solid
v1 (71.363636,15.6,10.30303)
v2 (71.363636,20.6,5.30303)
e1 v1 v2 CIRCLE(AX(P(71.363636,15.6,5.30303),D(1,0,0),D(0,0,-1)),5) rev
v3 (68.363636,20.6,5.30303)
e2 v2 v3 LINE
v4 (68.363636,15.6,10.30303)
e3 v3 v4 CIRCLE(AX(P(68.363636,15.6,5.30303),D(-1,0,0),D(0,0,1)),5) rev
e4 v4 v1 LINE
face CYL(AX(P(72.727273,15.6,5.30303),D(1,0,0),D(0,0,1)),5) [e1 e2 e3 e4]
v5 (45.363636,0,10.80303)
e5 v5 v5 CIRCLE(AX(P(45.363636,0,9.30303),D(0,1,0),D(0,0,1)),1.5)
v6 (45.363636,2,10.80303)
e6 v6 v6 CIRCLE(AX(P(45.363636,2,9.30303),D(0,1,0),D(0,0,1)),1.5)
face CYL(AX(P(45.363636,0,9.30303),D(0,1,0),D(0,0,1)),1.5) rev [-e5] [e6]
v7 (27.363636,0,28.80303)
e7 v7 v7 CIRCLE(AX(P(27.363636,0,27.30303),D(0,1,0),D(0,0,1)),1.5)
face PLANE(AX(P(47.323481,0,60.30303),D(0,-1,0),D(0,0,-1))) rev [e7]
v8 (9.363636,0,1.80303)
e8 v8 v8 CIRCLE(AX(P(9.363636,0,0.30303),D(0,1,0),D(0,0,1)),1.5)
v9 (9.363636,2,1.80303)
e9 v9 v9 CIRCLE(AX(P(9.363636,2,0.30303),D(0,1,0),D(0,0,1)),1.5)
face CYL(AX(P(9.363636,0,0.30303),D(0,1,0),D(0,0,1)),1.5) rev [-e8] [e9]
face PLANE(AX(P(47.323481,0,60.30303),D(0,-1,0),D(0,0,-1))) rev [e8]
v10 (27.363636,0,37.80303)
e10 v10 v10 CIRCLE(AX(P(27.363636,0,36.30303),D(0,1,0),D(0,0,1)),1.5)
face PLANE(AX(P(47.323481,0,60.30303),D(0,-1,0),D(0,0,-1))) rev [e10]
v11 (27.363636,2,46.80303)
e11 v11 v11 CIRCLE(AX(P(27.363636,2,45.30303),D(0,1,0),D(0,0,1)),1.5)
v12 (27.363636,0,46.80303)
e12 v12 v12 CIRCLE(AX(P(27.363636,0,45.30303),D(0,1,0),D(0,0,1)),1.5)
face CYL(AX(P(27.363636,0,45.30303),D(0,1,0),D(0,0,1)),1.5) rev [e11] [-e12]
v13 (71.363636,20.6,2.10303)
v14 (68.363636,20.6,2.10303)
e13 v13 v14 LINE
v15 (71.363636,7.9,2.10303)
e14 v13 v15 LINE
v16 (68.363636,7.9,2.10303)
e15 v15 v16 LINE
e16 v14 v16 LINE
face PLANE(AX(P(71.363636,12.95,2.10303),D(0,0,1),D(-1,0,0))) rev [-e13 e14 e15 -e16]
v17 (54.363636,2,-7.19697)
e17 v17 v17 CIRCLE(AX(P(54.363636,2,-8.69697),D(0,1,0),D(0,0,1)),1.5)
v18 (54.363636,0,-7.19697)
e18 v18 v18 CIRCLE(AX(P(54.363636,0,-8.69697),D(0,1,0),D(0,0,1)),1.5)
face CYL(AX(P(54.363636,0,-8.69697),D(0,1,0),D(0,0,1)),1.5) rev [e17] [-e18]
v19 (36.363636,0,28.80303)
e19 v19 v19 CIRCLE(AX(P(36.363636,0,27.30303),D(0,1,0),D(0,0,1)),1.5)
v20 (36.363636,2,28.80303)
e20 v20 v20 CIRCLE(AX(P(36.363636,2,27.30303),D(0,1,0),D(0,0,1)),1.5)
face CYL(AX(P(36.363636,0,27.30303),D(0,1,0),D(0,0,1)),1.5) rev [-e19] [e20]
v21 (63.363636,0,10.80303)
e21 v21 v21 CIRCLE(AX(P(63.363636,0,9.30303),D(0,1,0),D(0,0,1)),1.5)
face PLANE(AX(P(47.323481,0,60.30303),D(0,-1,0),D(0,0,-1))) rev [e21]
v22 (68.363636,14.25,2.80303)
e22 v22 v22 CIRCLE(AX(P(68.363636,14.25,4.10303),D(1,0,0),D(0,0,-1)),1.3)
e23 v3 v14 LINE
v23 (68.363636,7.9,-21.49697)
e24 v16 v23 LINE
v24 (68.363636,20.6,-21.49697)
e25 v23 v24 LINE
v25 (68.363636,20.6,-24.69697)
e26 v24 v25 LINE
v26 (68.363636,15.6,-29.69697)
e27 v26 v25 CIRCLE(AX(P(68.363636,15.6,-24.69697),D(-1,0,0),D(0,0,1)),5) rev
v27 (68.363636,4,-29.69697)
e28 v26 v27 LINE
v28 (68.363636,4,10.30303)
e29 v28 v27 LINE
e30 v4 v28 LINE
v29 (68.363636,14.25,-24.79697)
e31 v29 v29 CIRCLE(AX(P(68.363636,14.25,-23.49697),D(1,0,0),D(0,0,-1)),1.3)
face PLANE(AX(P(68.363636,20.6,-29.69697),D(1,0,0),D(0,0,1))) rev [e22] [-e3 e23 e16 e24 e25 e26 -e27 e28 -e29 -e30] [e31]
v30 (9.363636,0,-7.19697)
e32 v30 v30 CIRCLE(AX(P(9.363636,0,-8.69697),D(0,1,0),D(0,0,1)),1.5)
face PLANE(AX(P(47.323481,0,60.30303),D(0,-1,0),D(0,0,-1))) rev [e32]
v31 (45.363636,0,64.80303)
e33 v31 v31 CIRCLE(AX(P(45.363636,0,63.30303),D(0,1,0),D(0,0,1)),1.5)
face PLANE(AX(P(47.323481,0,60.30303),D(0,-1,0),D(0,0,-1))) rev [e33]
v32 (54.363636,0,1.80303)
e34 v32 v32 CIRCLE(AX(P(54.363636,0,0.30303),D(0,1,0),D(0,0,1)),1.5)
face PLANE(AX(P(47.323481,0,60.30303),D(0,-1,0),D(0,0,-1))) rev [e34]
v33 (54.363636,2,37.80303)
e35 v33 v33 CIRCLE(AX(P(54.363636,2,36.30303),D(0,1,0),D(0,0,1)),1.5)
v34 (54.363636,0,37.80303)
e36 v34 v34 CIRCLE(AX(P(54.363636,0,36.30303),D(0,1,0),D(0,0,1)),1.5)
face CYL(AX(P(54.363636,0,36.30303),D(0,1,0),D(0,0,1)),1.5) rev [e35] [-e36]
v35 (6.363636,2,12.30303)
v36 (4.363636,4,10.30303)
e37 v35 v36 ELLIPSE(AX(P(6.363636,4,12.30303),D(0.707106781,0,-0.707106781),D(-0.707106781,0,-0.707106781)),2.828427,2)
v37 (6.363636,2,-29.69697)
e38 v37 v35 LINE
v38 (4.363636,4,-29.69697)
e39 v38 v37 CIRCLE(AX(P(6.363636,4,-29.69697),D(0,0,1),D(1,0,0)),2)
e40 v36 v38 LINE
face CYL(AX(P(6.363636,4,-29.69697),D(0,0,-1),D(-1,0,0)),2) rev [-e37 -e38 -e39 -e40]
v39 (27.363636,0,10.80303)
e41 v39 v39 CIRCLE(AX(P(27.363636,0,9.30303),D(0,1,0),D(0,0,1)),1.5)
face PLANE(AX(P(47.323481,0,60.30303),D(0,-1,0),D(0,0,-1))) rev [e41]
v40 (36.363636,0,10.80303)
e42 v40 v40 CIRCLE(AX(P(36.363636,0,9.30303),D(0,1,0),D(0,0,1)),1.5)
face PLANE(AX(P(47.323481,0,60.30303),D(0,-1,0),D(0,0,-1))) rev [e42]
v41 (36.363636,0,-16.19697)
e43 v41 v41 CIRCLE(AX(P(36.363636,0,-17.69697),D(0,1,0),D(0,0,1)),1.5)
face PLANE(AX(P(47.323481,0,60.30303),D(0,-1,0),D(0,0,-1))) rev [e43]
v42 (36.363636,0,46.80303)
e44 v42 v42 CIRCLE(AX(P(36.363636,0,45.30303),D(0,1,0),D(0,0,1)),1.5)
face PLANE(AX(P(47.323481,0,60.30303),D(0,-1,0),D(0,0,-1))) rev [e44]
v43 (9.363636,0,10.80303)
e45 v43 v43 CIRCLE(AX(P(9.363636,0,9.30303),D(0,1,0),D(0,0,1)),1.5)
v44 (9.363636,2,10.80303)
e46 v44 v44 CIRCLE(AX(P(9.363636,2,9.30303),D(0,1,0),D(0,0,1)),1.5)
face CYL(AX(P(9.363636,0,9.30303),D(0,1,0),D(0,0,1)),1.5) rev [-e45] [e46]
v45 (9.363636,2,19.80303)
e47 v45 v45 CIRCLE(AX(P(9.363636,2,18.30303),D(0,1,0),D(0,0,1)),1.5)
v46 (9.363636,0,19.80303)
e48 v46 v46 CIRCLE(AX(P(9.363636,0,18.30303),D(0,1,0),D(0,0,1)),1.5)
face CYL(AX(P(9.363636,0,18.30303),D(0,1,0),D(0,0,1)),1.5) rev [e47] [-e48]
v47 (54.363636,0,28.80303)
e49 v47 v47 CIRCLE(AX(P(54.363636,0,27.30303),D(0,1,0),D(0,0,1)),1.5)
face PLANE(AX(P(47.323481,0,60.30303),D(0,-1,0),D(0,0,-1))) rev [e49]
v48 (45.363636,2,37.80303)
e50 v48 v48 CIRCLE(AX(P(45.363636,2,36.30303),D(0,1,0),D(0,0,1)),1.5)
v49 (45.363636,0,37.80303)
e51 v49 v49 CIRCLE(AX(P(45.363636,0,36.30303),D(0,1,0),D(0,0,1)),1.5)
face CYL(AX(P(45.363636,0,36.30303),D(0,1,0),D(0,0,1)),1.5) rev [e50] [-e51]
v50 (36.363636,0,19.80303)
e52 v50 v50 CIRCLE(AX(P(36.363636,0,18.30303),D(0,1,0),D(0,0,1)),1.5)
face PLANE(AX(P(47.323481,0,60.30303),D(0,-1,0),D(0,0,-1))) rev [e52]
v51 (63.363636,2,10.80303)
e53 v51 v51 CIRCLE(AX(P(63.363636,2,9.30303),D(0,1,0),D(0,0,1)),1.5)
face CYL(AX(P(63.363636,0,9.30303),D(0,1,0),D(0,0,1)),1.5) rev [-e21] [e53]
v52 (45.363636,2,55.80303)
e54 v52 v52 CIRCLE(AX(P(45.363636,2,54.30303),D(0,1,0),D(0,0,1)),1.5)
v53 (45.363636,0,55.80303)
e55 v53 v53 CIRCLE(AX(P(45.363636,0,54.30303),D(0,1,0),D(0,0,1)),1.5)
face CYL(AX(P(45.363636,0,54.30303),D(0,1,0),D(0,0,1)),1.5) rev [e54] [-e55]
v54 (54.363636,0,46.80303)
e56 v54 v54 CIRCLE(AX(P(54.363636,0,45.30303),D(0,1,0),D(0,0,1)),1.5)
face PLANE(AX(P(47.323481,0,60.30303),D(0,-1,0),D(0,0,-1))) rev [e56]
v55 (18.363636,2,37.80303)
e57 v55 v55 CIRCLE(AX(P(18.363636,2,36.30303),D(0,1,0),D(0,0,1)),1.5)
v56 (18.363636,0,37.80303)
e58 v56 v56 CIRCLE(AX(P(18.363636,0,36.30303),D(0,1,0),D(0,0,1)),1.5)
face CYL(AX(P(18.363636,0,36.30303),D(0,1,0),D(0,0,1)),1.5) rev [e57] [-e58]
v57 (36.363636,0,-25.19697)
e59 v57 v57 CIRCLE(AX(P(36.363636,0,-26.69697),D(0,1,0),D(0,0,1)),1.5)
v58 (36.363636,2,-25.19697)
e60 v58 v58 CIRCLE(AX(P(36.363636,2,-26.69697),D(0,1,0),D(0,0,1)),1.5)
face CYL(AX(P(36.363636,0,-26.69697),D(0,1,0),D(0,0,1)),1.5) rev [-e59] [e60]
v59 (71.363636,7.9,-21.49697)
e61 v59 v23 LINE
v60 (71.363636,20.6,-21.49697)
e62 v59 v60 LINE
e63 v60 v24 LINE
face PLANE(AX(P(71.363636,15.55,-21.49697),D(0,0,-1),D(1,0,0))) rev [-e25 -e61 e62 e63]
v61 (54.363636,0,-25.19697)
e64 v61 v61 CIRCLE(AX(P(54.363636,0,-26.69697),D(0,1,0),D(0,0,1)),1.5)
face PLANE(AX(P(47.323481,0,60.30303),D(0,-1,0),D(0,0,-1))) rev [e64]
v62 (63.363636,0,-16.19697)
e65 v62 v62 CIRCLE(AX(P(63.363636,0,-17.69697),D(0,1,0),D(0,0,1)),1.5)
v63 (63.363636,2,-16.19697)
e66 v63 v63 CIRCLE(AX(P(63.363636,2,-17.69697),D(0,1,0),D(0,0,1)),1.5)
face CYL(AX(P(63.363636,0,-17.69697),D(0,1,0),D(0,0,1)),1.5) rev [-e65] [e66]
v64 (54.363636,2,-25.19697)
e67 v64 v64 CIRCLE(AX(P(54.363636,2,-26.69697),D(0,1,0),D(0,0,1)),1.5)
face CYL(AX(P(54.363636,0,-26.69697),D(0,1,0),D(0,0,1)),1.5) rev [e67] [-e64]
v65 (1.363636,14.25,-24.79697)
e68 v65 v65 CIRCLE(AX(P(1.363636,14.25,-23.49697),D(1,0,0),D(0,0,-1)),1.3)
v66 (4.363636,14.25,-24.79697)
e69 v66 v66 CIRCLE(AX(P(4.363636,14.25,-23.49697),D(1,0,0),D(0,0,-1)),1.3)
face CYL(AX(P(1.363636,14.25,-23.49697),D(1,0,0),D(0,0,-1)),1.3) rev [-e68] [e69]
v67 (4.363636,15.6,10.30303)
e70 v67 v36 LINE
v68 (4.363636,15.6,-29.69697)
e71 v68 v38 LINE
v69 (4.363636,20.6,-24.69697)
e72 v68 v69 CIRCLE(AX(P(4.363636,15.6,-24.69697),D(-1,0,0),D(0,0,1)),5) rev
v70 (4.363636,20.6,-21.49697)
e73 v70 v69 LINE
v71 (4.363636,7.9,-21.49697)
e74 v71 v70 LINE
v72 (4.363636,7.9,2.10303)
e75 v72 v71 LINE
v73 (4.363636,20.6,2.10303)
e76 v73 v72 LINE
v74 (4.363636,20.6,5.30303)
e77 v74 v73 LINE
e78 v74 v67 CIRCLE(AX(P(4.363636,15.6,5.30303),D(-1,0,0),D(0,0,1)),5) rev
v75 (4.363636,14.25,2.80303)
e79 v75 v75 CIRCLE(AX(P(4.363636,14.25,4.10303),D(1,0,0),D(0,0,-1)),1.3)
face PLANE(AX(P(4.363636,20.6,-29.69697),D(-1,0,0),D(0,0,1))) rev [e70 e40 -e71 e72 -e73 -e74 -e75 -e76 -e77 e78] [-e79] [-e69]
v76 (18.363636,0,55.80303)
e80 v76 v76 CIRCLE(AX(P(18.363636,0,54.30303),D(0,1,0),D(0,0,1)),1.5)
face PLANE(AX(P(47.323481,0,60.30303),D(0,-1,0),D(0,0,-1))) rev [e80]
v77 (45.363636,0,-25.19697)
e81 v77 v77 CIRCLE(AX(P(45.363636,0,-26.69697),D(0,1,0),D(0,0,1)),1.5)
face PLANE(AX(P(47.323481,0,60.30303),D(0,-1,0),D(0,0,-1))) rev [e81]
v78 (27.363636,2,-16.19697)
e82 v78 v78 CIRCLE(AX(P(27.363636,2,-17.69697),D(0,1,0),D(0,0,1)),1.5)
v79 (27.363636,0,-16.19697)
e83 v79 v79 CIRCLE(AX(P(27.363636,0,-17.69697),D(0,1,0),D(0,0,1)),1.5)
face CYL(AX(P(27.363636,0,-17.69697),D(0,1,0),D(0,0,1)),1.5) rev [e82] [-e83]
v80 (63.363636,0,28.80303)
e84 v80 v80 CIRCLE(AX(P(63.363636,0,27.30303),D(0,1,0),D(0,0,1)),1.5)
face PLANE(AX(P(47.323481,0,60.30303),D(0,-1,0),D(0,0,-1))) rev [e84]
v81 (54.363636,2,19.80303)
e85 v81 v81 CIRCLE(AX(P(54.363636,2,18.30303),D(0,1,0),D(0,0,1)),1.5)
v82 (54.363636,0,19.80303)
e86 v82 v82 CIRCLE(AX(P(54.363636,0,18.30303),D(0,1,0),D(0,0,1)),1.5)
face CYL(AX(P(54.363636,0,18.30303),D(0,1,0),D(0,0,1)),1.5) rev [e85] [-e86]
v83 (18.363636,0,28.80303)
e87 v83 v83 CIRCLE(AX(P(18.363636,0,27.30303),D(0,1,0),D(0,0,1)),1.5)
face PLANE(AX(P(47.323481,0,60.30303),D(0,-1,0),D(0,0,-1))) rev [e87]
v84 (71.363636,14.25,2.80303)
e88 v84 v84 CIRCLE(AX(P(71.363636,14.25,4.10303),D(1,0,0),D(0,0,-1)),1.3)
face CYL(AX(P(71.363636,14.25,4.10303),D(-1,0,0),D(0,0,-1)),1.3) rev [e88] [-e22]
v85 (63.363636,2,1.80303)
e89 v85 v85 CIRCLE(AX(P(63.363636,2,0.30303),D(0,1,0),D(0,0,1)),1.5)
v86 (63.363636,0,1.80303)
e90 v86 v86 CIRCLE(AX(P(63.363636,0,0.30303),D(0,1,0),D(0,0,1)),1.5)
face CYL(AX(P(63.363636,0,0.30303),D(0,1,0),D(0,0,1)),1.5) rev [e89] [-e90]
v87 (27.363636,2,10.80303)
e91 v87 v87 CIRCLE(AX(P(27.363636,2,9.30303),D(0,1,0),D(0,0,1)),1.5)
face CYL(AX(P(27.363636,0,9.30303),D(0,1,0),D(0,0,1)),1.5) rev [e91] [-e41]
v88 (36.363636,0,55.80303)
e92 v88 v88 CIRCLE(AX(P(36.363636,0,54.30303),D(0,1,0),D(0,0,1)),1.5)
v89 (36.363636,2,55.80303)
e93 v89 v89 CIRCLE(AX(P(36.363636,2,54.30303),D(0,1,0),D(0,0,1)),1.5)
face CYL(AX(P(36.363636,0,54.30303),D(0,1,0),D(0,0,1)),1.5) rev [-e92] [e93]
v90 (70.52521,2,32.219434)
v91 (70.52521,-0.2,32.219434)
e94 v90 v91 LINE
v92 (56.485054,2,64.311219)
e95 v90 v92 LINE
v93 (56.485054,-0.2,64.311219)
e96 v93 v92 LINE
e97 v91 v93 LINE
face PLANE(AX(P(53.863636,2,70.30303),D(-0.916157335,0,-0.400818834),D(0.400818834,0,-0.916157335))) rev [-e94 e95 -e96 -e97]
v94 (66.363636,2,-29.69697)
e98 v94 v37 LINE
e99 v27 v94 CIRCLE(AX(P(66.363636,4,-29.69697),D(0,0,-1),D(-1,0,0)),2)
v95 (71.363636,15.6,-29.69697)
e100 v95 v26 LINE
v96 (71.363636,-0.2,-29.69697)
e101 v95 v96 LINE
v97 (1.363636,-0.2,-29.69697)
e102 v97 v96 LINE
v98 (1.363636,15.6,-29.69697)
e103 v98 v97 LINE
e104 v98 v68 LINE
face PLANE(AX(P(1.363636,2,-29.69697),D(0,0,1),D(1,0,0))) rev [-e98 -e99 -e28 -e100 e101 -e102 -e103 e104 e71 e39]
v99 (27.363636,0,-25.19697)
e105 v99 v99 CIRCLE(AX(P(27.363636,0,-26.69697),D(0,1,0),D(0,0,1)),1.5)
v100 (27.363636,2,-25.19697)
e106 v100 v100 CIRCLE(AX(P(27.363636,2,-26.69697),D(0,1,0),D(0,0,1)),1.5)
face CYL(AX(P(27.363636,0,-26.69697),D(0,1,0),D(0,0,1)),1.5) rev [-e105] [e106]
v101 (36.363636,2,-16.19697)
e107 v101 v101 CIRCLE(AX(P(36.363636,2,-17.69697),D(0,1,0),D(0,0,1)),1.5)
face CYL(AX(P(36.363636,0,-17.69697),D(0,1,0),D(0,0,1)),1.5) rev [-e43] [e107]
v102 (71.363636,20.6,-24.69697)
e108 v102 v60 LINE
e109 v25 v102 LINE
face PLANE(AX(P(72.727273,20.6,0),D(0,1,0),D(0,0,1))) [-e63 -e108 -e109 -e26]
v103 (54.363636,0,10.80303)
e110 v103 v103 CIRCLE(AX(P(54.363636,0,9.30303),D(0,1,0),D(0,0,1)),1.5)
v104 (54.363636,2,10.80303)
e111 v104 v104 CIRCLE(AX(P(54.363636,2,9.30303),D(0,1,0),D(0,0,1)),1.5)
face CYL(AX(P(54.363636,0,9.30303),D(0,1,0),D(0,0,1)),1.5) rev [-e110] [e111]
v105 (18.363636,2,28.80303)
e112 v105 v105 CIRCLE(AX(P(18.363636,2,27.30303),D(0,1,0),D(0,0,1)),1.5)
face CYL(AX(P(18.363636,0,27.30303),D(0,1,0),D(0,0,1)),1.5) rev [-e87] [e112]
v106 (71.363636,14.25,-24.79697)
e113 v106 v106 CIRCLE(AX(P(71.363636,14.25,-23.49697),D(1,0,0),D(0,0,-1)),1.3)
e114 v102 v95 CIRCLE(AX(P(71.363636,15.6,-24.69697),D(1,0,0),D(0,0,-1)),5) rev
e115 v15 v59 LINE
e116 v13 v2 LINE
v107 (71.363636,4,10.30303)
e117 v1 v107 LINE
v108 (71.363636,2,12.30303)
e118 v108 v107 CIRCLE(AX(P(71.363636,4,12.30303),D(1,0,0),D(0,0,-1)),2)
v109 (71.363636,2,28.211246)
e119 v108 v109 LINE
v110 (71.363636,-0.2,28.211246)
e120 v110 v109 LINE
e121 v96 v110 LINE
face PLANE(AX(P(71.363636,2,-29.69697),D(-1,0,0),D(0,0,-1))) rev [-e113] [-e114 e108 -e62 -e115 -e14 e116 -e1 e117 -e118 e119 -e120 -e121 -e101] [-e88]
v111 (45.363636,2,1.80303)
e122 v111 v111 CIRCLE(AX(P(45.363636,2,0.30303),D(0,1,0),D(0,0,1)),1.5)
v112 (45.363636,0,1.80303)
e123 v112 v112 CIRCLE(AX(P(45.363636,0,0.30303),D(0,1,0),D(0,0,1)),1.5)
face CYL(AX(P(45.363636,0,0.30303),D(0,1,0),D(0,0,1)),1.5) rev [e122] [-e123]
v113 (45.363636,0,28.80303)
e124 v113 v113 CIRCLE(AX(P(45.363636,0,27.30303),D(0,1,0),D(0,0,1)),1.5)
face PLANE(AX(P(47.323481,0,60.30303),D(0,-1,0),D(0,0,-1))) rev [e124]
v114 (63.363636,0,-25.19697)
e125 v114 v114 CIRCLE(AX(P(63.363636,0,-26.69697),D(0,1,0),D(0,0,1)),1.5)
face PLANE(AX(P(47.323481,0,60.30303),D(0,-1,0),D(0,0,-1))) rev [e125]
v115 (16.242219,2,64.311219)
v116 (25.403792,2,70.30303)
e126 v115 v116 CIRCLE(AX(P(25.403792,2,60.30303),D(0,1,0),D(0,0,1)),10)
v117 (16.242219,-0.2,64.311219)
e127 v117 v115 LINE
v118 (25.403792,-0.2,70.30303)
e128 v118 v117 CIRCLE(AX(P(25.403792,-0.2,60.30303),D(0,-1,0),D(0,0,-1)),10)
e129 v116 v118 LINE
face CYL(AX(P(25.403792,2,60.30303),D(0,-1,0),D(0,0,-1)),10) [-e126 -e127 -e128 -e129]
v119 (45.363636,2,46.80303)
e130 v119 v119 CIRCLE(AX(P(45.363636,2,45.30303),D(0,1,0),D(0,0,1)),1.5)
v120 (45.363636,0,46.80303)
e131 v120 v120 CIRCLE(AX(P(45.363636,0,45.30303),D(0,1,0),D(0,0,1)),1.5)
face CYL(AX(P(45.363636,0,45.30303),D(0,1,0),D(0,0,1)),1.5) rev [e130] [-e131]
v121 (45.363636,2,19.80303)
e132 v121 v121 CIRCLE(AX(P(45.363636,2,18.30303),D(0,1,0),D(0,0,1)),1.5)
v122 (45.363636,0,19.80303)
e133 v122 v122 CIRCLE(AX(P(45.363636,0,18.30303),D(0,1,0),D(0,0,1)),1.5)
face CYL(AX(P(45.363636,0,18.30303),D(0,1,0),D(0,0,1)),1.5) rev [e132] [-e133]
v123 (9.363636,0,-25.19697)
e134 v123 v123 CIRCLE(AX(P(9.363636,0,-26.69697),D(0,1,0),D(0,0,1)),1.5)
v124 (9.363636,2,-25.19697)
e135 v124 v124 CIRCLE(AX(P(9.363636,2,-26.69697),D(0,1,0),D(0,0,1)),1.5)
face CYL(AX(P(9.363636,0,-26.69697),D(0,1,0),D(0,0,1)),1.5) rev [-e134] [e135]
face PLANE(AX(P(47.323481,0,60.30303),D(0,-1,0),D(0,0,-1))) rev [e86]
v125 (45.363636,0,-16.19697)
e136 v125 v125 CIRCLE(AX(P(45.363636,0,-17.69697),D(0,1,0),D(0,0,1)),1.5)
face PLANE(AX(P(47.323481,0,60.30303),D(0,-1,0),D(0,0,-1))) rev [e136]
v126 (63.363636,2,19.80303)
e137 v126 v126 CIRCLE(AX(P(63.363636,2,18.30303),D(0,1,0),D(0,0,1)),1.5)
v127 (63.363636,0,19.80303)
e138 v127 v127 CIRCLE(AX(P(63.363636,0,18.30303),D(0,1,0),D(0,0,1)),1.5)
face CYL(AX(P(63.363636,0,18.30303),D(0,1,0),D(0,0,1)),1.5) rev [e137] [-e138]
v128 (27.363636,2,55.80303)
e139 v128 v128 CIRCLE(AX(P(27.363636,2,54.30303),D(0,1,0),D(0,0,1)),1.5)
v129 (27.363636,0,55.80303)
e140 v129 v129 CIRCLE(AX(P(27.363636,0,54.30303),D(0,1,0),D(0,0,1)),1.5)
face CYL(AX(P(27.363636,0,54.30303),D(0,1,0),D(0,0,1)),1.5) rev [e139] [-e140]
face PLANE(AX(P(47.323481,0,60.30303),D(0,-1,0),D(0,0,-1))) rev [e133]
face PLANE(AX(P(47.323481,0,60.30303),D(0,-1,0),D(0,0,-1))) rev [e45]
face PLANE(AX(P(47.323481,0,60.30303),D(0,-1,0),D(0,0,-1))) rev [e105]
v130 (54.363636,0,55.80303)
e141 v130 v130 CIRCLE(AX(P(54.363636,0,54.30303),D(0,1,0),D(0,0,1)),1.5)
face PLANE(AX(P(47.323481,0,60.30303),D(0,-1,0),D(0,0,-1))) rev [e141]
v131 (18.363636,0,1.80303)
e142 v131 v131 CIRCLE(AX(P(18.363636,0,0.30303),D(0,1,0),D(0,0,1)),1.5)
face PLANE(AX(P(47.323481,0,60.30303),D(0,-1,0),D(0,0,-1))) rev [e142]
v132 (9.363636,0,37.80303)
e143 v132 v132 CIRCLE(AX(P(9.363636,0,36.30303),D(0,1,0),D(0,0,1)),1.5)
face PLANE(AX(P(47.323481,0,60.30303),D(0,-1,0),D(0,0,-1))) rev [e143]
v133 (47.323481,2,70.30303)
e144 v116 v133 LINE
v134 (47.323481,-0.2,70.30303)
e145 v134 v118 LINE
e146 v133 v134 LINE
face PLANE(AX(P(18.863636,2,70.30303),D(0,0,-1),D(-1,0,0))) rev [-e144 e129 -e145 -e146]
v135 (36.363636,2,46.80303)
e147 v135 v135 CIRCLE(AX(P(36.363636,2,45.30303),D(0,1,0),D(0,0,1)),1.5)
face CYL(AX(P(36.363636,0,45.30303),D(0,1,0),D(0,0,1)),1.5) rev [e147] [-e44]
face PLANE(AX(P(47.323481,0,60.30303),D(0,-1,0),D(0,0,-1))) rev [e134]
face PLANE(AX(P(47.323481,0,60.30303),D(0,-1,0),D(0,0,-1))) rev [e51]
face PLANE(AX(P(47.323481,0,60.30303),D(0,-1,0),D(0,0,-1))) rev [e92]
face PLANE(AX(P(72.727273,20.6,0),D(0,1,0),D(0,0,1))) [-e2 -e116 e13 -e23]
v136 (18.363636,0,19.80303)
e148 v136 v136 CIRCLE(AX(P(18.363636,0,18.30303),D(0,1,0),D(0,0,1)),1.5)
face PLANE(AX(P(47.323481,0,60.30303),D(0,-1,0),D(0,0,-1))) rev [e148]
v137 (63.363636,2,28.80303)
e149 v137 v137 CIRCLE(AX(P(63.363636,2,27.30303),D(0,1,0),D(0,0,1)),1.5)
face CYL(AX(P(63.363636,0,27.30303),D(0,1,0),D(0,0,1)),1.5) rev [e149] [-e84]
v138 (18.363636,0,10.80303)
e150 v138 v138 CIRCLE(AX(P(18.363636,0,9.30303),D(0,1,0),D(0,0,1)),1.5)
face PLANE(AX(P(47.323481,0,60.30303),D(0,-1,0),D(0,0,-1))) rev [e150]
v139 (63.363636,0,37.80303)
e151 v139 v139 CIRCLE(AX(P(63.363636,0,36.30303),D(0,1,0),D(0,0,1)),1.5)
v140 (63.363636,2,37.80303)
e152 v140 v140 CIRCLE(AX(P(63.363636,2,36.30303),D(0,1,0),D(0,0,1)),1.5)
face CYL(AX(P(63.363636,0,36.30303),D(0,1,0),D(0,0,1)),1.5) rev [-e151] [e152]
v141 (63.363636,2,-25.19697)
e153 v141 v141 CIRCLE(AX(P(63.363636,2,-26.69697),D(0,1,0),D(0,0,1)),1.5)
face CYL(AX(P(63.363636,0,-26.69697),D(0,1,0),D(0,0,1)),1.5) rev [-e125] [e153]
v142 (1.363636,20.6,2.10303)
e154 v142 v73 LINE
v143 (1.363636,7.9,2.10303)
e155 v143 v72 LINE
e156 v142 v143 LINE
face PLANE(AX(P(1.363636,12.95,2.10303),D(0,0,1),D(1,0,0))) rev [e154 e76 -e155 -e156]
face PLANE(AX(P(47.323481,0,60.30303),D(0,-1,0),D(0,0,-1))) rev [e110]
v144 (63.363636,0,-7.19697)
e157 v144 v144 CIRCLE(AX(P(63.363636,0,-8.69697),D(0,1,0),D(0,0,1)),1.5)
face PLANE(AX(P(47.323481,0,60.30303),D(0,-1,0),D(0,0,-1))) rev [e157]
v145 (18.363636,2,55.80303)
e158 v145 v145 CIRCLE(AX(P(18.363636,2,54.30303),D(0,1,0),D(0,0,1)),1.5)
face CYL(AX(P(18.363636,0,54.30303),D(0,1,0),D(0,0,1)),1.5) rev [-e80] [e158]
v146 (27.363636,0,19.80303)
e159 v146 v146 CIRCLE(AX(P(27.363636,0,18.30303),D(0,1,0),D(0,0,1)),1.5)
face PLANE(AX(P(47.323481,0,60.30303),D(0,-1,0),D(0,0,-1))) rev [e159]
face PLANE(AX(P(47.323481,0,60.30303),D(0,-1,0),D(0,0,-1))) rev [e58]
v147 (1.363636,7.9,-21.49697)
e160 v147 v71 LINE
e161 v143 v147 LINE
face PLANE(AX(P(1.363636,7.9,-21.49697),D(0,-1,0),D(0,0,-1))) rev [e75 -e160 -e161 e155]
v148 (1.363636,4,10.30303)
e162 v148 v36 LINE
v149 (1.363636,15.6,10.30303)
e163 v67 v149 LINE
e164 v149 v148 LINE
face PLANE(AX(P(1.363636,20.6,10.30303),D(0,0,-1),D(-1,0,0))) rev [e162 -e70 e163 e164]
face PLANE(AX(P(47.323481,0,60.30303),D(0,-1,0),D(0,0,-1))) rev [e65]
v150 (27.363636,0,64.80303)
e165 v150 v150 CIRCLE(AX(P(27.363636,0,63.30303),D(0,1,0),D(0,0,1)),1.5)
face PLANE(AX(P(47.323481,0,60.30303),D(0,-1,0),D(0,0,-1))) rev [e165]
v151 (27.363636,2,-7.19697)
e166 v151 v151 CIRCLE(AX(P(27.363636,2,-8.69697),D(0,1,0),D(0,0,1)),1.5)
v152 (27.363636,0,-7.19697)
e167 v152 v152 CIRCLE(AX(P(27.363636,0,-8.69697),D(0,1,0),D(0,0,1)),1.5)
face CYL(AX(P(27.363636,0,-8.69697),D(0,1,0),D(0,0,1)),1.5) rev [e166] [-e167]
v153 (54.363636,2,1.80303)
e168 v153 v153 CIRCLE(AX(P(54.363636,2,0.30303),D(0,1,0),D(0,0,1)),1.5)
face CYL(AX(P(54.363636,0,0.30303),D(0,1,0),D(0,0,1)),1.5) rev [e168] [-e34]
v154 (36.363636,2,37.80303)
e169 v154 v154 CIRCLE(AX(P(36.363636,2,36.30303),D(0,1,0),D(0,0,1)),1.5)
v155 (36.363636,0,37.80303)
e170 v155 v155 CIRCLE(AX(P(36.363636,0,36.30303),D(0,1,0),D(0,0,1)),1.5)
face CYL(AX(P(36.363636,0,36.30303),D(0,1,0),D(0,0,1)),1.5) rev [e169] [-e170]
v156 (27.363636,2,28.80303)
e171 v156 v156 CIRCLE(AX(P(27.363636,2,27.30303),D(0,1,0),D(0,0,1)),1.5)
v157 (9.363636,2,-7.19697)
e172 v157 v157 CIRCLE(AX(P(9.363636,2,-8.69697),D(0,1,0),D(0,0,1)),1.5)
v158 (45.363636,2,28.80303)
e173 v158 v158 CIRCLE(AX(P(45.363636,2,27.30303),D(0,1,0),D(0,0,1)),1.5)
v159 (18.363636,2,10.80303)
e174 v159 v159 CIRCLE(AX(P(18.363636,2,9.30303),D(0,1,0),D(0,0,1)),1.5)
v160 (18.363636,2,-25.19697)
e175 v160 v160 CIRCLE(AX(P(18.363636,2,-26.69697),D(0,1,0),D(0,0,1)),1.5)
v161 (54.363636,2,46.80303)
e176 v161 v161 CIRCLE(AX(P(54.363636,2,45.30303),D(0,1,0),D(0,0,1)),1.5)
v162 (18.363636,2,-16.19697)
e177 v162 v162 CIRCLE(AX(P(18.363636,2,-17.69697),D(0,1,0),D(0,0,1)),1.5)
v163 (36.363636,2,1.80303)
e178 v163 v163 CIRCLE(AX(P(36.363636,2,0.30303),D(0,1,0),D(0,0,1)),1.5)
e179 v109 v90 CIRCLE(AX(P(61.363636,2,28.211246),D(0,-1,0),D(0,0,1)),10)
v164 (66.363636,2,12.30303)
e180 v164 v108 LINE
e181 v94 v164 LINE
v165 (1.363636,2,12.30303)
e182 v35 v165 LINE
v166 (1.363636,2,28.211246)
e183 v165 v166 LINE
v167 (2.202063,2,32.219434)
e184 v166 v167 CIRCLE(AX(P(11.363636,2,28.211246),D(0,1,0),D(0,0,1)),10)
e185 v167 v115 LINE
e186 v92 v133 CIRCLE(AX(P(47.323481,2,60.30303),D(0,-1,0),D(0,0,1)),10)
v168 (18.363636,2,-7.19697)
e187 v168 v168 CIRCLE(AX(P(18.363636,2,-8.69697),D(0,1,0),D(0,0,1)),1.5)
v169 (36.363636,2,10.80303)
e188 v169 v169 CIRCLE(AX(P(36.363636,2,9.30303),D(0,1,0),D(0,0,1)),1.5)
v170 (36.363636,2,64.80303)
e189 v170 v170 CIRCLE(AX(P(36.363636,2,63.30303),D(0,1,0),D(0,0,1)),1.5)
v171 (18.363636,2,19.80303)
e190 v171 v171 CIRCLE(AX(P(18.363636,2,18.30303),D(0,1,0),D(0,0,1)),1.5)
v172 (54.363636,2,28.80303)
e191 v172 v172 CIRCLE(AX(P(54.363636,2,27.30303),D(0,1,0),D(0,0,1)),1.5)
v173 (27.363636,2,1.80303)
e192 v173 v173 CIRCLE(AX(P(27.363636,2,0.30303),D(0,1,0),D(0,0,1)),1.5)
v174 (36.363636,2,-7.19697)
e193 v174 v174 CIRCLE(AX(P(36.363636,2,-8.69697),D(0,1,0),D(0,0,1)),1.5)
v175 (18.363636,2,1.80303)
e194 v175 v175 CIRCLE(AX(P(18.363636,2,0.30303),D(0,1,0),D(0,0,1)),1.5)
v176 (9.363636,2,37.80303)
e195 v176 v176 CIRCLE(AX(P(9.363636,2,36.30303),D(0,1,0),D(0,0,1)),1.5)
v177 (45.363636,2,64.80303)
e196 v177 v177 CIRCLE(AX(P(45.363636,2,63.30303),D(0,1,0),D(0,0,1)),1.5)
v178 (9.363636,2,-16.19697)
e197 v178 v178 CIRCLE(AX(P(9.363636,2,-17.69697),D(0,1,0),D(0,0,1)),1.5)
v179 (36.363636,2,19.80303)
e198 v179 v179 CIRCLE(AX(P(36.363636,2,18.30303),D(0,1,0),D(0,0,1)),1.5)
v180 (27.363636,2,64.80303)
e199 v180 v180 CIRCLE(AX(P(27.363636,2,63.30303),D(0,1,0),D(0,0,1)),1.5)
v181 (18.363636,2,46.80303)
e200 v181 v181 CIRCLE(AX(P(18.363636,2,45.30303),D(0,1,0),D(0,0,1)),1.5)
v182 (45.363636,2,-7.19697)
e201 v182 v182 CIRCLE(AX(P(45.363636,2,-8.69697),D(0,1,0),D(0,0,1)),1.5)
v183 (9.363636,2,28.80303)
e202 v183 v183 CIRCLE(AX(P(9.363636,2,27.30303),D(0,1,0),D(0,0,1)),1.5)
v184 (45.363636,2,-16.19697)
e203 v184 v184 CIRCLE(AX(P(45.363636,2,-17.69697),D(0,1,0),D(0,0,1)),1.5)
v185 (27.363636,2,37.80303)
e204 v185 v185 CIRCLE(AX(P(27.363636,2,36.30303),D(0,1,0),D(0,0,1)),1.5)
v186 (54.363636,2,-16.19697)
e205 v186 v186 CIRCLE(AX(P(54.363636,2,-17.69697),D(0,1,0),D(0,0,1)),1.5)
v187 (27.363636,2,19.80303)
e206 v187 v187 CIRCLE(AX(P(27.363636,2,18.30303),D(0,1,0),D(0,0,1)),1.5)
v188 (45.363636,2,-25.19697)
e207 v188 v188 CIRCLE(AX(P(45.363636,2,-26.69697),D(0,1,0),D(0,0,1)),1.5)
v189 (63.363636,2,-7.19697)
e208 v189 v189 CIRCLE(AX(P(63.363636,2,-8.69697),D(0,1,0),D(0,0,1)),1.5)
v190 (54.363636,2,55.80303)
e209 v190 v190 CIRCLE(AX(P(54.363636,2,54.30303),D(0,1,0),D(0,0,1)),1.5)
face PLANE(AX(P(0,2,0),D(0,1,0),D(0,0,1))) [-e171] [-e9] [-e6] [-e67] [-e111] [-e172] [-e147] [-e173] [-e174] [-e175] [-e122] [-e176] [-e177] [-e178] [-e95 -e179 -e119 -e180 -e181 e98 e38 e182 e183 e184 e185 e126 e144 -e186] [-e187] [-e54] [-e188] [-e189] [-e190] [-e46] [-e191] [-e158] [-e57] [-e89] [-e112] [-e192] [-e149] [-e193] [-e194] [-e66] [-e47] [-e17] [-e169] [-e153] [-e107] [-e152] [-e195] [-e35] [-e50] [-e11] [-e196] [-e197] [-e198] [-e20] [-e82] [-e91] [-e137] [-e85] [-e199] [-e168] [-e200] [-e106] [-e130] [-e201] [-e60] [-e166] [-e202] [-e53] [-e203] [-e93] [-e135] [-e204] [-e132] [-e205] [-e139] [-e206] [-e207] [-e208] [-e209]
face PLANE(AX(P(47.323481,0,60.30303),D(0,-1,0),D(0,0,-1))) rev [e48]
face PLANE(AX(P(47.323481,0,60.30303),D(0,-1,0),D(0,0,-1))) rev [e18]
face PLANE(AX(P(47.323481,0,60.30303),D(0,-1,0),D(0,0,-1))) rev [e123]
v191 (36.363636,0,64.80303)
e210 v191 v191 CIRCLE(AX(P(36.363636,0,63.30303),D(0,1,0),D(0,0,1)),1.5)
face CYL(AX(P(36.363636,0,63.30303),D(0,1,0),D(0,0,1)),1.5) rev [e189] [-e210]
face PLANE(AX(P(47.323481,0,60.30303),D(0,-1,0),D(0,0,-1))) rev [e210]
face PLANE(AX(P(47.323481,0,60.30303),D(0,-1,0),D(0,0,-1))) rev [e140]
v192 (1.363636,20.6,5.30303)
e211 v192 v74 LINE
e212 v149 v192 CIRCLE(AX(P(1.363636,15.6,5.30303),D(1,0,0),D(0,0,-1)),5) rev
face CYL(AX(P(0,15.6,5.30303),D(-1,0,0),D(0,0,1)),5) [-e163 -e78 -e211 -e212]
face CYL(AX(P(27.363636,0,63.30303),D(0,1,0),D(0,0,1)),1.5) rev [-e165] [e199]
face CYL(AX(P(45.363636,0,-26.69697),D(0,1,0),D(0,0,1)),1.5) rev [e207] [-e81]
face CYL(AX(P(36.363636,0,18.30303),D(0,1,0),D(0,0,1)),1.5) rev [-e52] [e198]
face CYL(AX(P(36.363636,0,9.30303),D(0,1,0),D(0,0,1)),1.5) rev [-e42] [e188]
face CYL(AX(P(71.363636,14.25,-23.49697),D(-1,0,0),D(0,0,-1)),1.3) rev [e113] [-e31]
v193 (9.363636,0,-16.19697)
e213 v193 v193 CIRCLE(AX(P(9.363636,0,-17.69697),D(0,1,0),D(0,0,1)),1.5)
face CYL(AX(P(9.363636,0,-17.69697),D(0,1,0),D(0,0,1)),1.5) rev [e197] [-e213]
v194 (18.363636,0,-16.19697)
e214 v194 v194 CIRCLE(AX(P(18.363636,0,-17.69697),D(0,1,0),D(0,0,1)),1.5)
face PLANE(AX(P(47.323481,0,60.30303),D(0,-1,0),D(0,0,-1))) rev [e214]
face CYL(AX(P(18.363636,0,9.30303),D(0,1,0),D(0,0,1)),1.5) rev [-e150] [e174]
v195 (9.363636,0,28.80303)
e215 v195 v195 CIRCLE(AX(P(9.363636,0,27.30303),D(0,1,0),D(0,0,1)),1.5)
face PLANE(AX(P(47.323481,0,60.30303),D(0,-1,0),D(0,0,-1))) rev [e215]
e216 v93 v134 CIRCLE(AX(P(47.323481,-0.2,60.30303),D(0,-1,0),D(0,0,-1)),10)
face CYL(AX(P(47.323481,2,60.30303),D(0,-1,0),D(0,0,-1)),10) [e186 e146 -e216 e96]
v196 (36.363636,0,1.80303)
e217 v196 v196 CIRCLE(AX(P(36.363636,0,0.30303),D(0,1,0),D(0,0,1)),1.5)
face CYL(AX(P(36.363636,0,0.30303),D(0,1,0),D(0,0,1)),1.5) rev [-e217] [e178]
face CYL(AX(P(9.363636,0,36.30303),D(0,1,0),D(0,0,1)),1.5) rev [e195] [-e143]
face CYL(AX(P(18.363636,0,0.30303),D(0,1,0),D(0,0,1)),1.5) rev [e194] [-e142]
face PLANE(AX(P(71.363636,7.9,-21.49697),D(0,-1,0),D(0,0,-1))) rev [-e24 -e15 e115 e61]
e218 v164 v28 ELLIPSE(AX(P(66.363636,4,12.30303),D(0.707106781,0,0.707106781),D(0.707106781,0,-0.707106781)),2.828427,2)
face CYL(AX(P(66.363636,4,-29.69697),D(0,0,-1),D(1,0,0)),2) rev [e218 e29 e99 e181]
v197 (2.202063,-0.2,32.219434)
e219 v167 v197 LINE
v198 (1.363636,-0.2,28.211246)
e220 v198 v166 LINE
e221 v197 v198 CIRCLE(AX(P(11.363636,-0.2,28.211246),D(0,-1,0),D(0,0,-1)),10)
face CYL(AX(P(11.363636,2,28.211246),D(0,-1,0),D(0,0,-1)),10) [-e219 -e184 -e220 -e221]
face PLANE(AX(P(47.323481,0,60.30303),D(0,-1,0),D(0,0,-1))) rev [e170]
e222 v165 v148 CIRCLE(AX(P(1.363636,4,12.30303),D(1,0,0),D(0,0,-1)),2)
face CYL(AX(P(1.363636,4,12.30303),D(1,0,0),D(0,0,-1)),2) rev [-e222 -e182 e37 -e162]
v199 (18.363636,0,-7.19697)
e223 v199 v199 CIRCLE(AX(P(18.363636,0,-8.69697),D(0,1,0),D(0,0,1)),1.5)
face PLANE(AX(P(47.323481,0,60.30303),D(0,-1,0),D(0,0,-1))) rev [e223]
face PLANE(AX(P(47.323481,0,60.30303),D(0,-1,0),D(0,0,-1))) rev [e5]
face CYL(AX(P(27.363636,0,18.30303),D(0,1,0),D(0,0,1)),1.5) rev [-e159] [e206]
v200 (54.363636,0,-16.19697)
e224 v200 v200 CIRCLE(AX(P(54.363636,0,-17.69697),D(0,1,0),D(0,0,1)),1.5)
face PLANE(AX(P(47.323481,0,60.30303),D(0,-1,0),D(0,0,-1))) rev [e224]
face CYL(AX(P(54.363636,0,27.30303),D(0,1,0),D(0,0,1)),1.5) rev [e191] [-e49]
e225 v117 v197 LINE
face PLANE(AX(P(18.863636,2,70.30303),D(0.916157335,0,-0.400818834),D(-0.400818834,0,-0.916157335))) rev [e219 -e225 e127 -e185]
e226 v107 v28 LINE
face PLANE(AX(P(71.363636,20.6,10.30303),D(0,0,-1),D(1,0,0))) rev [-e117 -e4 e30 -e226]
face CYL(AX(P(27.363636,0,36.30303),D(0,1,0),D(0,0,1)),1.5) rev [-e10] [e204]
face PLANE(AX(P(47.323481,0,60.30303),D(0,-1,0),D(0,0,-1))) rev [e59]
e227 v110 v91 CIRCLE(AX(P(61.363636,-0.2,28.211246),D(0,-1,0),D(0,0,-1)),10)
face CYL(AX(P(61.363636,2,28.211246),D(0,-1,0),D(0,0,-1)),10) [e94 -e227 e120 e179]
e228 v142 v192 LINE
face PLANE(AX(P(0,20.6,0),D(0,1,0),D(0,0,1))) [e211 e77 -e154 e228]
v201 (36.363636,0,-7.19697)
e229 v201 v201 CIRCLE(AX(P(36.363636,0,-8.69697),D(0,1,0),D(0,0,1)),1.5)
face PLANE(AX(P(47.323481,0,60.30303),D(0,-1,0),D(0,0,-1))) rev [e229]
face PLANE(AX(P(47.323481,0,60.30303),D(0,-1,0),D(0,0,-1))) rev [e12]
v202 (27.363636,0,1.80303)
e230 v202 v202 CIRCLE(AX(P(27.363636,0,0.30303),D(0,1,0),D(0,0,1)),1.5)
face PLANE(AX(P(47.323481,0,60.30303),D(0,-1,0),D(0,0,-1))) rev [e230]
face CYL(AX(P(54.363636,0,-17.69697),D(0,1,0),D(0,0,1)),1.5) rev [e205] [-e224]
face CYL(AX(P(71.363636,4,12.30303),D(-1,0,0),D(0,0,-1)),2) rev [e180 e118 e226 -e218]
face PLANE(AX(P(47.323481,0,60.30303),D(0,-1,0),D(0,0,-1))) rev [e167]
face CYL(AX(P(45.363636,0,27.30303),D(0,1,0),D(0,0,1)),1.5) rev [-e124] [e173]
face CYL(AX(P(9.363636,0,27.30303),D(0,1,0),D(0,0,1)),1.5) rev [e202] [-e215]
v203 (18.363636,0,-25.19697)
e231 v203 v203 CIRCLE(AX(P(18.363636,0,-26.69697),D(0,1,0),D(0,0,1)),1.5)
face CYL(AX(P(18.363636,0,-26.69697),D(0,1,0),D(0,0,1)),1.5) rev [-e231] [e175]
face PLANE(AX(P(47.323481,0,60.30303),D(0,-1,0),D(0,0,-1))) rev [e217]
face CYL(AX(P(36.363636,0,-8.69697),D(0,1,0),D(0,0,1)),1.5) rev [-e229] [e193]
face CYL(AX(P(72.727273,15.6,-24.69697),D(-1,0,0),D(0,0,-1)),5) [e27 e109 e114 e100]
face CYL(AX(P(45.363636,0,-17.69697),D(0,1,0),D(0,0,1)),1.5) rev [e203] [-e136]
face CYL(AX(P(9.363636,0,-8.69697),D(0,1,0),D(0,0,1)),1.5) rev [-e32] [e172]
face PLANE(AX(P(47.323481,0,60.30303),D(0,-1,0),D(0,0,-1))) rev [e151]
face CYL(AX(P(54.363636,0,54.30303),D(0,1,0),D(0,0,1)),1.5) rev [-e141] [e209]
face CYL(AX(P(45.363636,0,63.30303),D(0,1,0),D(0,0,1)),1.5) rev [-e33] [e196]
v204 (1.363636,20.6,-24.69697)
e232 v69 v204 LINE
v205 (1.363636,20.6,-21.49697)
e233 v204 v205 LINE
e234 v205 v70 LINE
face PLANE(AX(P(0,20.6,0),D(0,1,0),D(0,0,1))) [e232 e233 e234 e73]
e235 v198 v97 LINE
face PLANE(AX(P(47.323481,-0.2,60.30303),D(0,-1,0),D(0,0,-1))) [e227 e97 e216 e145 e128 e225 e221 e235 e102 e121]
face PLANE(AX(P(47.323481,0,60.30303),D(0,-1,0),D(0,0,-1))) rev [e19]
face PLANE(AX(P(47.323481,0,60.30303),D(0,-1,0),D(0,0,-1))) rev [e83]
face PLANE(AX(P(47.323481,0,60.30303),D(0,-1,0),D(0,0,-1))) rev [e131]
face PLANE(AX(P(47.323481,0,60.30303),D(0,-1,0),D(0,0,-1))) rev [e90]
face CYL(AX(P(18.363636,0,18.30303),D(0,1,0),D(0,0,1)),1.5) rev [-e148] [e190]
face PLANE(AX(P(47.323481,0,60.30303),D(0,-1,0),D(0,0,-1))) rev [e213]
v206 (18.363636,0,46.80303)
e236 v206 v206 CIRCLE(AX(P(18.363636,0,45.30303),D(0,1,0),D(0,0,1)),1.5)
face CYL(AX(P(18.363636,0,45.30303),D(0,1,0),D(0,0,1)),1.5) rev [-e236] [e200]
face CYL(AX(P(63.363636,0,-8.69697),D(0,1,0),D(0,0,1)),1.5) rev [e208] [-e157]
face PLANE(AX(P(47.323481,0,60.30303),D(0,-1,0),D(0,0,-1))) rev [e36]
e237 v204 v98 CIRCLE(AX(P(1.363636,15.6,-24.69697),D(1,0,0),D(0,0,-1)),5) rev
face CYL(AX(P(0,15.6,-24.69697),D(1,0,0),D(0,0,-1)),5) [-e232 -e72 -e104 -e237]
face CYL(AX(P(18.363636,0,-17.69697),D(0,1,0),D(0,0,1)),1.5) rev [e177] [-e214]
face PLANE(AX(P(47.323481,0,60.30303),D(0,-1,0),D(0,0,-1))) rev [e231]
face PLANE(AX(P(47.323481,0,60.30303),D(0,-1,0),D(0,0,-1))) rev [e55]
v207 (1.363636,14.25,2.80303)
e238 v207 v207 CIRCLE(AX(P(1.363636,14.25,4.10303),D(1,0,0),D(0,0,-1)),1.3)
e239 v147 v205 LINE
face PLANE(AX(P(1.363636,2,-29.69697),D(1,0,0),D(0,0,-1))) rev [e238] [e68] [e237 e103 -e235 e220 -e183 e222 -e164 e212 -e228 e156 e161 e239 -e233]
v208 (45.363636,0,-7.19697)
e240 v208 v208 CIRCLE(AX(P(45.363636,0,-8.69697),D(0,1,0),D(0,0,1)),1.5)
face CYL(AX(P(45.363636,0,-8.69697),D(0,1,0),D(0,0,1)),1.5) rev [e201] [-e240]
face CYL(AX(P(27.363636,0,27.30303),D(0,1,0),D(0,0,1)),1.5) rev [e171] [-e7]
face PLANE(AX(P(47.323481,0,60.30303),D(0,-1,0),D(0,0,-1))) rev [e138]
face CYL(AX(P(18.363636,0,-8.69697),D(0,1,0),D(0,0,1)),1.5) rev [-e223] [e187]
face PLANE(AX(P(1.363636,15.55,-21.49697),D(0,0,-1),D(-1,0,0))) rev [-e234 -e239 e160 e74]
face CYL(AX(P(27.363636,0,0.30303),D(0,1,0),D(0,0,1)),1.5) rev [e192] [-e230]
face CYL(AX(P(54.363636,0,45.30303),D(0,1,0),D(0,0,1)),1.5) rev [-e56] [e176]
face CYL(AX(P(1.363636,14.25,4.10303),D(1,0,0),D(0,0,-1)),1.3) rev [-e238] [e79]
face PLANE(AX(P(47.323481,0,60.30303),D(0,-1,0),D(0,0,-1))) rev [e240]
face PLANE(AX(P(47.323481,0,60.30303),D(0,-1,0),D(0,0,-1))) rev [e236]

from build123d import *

# Parameters (mm, degrees)
BASE_DEPTH              = 2
SKETCH2_W               = 3
SKETCH2_H               = 40
SERVOLEG_DEPTH          = 18.6
SKETCH3_R               = 1.3
SERVOCUTOUT_DEPTH       = 80.942955098
FILLET2_R               = 10
FILLET3_R               = 2
FILLET4_R               = 5
SKETCH4_R               = 1.5
MATERIALREMOVAL_DEPTH   = 102.88839318
MOUNTINGHOLES_OUTLINE_R = 1.5
MOUNTINGHOLES_DEPTH     = 2
FIXTOPRINT3D_DEPTH      = 0.2


# Read off the part's stored shape, not the designer's step: MountingHoles
with BuildPart() as part:
    # Sketch1 → Base (new body)
    with BuildSketch(Plane(origin=(0, 0, 0), x_dir=(1, 0, 0), z_dir=(0, 1, 0))):
        Polygon((18.863636364, -70.303030303), (1.363636364, -30.303030303), (1.363636364, 29.696969697), (36.363636364, 29.696969697), (36.363636364, -70.303030303), align=None)
    extrude(amount=BASE_DEPTH)

    # Sketch2 → ServoLeg (add)
    with BuildSketch(Plane(origin=(0, 2, 0), x_dir=(1, 0, 0), z_dir=(0, 1, 0))):
        with Locations((2.863636364, 9.696969697)):
            Rectangle(SKETCH2_W, SKETCH2_H)
    extrude(amount=SERVOLEG_DEPTH)

    # Sketch3 → ServoCutout (cut, through all)
    with BuildSketch(Plane(origin=(4.363636364, 0, 0), x_dir=(0, 0, -1), z_dir=(1, 0, 0))):
        with Locations((23.496969697, 14.25)):
            Circle(SKETCH3_R)
        with Locations((-4.103030303, 14.25)):
            Circle(SKETCH3_R)
        Polygon((21.496969697, 20.6), (-2.103030303, 20.6), (-2.103030303, 15.55), (-2.103030303, 12.95), (-2.103030303, 7.9), (21.496969697, 7.9), (21.496969697, 12.95), (21.496969697, 15.55), align=None)
    extrude(amount=-SERVOCUTOUT_DEPTH, mode=Mode.SUBTRACT)

    # Fillet2
    fillet2_edges = [part.edges().sort_by_distance(p)[0] for p in [
        (18.863636364, 1, 70.303030303),
        (1.363636364, 1, 30.303030303),
    ]]
    fillet(fillet2_edges, radius=FILLET2_R)

    # Fillet3
    fillet3_edges = [part.edges().sort_by_distance(p)[0] for p in [
        (2.863636364, 2, 10.303030303),
        (4.363636364, 2, -9.696969697),
    ]]
    fillet(fillet3_edges, radius=FILLET3_R)

    # Fillet4
    fillet4_edges = [part.edges().sort_by_distance(p)[0] for p in [
        (2.863636364, 20.6, 10.303030303),
        (2.863636364, 20.6, -29.696969697),
    ]]
    fillet(fillet4_edges, radius=FILLET4_R)

    # Mirror1: part across plane


with BuildPart() as part_1:
    add(part.part)
    add(part.part.mirror(Plane(origin=(36.363636364, 2, -29.696969697), x_dir=(0, 0, 1), z_dir=(-1, 0, 0))))

    # Sketch4 → MaterialRemoval (cut, through all)
    with BuildSketch(Plane(origin=(0, 2, 0), x_dir=(1, 0, 0), z_dir=(0, 1, 0))):
        with Locations(Location((9.363636364, 26.696969697, 0), (0, 0, 270))):
            Circle(SKETCH4_R)
    extrude(amount=-MATERIALREMOVAL_DEPTH, mode=Mode.SUBTRACT)

    # MountingHoles outline → MountingHoles (cut)
    with BuildSketch(Plane(origin=(0, 0, 0), x_dir=(1, 0, 0), z_dir=(0, 1, 0))):
        with Locations((9.363636364, -36.303030303)):
            Circle(MOUNTINGHOLES_OUTLINE_R)
        with Locations((63.363636364, 26.696969697)):
            Circle(MOUNTINGHOLES_OUTLINE_R)
        with Locations((63.363636364, 17.696969697)):
            Circle(MOUNTINGHOLES_OUTLINE_R)
        with Locations((63.363636364, 8.696969697)):
            Circle(MOUNTINGHOLES_OUTLINE_R)
        with Locations((18.363636364, 26.696969697)):
            Circle(MOUNTINGHOLES_OUTLINE_R)
        with Locations((18.363636364, 17.696969697)):
            Circle(MOUNTINGHOLES_OUTLINE_R)
        with Locations((18.363636364, 8.696969697)):
            Circle(MOUNTINGHOLES_OUTLINE_R)
        with Locations((18.363636364, -0.303030303)):
            Circle(MOUNTINGHOLES_OUTLINE_R)
        with Locations((18.363636364, -9.303030303)):
            Circle(MOUNTINGHOLES_OUTLINE_R)
        with Locations((18.363636364, -18.303030303)):
            Circle(MOUNTINGHOLES_OUTLINE_R)
        with Locations((18.363636364, -27.303030303)):
            Circle(MOUNTINGHOLES_OUTLINE_R)
        with Locations((18.363636364, -36.303030303)):
            Circle(MOUNTINGHOLES_OUTLINE_R)
        with Locations((9.363636364, -27.303030303)):
            Circle(MOUNTINGHOLES_OUTLINE_R)
        with Locations((9.363636364, -18.303030303)):
            Circle(MOUNTINGHOLES_OUTLINE_R)
        with Locations((9.363636364, -9.303030303)):
            Circle(MOUNTINGHOLES_OUTLINE_R)
        with Locations((9.363636364, -0.303030303)):
            Circle(MOUNTINGHOLES_OUTLINE_R)
        with Locations((9.363636364, 8.696969697)):
            Circle(MOUNTINGHOLES_OUTLINE_R)
        with Locations((9.363636364, 17.696969697)):
            Circle(MOUNTINGHOLES_OUTLINE_R)
        with Locations((18.363636364, -54.303030303)):
            Circle(MOUNTINGHOLES_OUTLINE_R)
        with Locations((18.363636364, -45.303030303)):
            Circle(MOUNTINGHOLES_OUTLINE_R)
        with Locations((36.363636364, -63.303030303)):
            Circle(MOUNTINGHOLES_OUTLINE_R)
        with Locations((27.363636364, 26.696969697)):
            Circle(MOUNTINGHOLES_OUTLINE_R)
        with Locations((27.363636364, 17.696969697)):
            Circle(MOUNTINGHOLES_OUTLINE_R)
        with Locations((27.363636364, 8.696969697)):
            Circle(MOUNTINGHOLES_OUTLINE_R)
        with Locations((36.363636364, -54.303030303)):
            Circle(MOUNTINGHOLES_OUTLINE_R)
        with Locations((36.363636364, -45.303030303)):
            Circle(MOUNTINGHOLES_OUTLINE_R)
        with Locations((36.363636364, -36.303030303)):
            Circle(MOUNTINGHOLES_OUTLINE_R)
        with Locations((36.363636364, -27.303030303)):
            Circle(MOUNTINGHOLES_OUTLINE_R)
        with Locations((27.363636364, -0.303030303)):
            Circle(MOUNTINGHOLES_OUTLINE_R)
        with Locations((27.363636364, -9.303030303)):
            Circle(MOUNTINGHOLES_OUTLINE_R)
        with Locations((27.363636364, -18.303030303)):
            Circle(MOUNTINGHOLES_OUTLINE_R)
        with Locations((27.363636364, -27.303030303)):
            Circle(MOUNTINGHOLES_OUTLINE_R)
        with Locations((27.363636364, -36.303030303)):
            Circle(MOUNTINGHOLES_OUTLINE_R)
        with Locations((27.363636364, -45.303030303)):
            Circle(MOUNTINGHOLES_OUTLINE_R)
        with Locations((27.363636364, -54.303030303)):
            Circle(MOUNTINGHOLES_OUTLINE_R)
        with Locations((27.363636364, -63.303030303)):
            Circle(MOUNTINGHOLES_OUTLINE_R)
        with Locations((54.363636364, -0.303030303)):
            Circle(MOUNTINGHOLES_OUTLINE_R)
        with Locations((54.363636364, -9.303030303)):
            Circle(MOUNTINGHOLES_OUTLINE_R)
        with Locations((54.363636364, -18.303030303)):
            Circle(MOUNTINGHOLES_OUTLINE_R)
        with Locations((54.363636364, -27.303030303)):
            Circle(MOUNTINGHOLES_OUTLINE_R)
        with Locations((45.363636364, 26.696969697)):
            Circle(MOUNTINGHOLES_OUTLINE_R)
        with Locations((54.363636364, -54.303030303)):
            Circle(MOUNTINGHOLES_OUTLINE_R)
        with Locations((54.363636364, -45.303030303)):
            Circle(MOUNTINGHOLES_OUTLINE_R)
        with Locations((54.363636364, -36.303030303)):
            Circle(MOUNTINGHOLES_OUTLINE_R)
        with Locations((63.363636364, -0.303030303)):
            Circle(MOUNTINGHOLES_OUTLINE_R)
        with Locations((63.363636364, -9.303030303)):
            Circle(MOUNTINGHOLES_OUTLINE_R)
        with Locations((63.363636364, -18.303030303)):
            Circle(MOUNTINGHOLES_OUTLINE_R)
        with Locations((63.363636364, -27.303030303)):
            Circle(MOUNTINGHOLES_OUTLINE_R)
        with Locations((54.363636364, 8.696969697)):
            Circle(MOUNTINGHOLES_OUTLINE_R)
        with Locations((54.363636364, 17.696969697)):
            Circle(MOUNTINGHOLES_OUTLINE_R)
        with Locations((54.363636364, 26.696969697)):
            Circle(MOUNTINGHOLES_OUTLINE_R)
        with Locations((63.363636364, -36.303030303)):
            Circle(MOUNTINGHOLES_OUTLINE_R)
        with Locations((45.363636364, -54.303030303)):
            Circle(MOUNTINGHOLES_OUTLINE_R)
        with Locations((45.363636364, -63.303030303)):
            Circle(MOUNTINGHOLES_OUTLINE_R)
        with Locations((36.363636364, 26.696969697)):
            Circle(MOUNTINGHOLES_OUTLINE_R)
        with Locations((36.363636364, 17.696969697)):
            Circle(MOUNTINGHOLES_OUTLINE_R)
        with Locations((36.363636364, 8.696969697)):
            Circle(MOUNTINGHOLES_OUTLINE_R)
        with Locations((36.363636364, -0.303030303)):
            Circle(MOUNTINGHOLES_OUTLINE_R)
        with Locations((36.363636364, -9.303030303)):
            Circle(MOUNTINGHOLES_OUTLINE_R)
        with Locations((36.363636364, -18.303030303)):
            Circle(MOUNTINGHOLES_OUTLINE_R)
        with Locations((45.363636364, -45.303030303)):
            Circle(MOUNTINGHOLES_OUTLINE_R)
        with Locations((45.363636364, -36.303030303)):
            Circle(MOUNTINGHOLES_OUTLINE_R)
        with Locations((45.363636364, -27.303030303)):
            Circle(MOUNTINGHOLES_OUTLINE_R)
        with Locations((45.363636364, -18.303030303)):
            Circle(MOUNTINGHOLES_OUTLINE_R)
        with Locations((45.363636364, -9.303030303)):
            Circle(MOUNTINGHOLES_OUTLINE_R)
        with Locations((45.363636364, -0.303030303)):
            Circle(MOUNTINGHOLES_OUTLINE_R)
        with Locations((45.363636364, 8.696969697)):
            Circle(MOUNTINGHOLES_OUTLINE_R)
        with Locations((45.363636364, 17.696969697)):
            Circle(MOUNTINGHOLES_OUTLINE_R)
    extrude(amount=MOUNTINGHOLES_DEPTH, mode=Mode.SUBTRACT)

    # Sketch5 → FixToPrint3d (add)
    with BuildSketch(Plane.XZ):
        with BuildLine():
            Line((47.323480616, 70.303030303), (25.403792111, 70.303030303))
            ThreePointArc((25.403792111, 70.303030303), (19.930305261, 68.672076945), (16.242218762, 64.311218643))
            Line((16.242218762, 64.311218643), (2.202063015, 32.219434077))
            ThreePointArc((2.202063015, 32.219434077), (1.575487062, 30.258715701), (1.363636364, 28.211245736))
            Line((1.363636364, 28.211245736), (1.363636364, -29.696969697))
            Line((1.363636364, -29.696969697), (71.363636364, -29.696969697))
            Line((71.363636364, -29.696969697), (71.363636364, 28.211245736))
            ThreePointArc((71.363636364, 28.211245736), (71.151785665, 30.258715701), (70.525209713, 32.219434077))
            Line((70.525209713, 32.219434077), (56.485053965, 64.311218643))
            ThreePointArc((56.485053965, 64.311218643), (52.796967466, 68.672076945), (47.323480616, 70.303030303))
        make_face()
    extrude(amount=FIXTOPRINT3D_DEPTH)


solid = part_1.part
